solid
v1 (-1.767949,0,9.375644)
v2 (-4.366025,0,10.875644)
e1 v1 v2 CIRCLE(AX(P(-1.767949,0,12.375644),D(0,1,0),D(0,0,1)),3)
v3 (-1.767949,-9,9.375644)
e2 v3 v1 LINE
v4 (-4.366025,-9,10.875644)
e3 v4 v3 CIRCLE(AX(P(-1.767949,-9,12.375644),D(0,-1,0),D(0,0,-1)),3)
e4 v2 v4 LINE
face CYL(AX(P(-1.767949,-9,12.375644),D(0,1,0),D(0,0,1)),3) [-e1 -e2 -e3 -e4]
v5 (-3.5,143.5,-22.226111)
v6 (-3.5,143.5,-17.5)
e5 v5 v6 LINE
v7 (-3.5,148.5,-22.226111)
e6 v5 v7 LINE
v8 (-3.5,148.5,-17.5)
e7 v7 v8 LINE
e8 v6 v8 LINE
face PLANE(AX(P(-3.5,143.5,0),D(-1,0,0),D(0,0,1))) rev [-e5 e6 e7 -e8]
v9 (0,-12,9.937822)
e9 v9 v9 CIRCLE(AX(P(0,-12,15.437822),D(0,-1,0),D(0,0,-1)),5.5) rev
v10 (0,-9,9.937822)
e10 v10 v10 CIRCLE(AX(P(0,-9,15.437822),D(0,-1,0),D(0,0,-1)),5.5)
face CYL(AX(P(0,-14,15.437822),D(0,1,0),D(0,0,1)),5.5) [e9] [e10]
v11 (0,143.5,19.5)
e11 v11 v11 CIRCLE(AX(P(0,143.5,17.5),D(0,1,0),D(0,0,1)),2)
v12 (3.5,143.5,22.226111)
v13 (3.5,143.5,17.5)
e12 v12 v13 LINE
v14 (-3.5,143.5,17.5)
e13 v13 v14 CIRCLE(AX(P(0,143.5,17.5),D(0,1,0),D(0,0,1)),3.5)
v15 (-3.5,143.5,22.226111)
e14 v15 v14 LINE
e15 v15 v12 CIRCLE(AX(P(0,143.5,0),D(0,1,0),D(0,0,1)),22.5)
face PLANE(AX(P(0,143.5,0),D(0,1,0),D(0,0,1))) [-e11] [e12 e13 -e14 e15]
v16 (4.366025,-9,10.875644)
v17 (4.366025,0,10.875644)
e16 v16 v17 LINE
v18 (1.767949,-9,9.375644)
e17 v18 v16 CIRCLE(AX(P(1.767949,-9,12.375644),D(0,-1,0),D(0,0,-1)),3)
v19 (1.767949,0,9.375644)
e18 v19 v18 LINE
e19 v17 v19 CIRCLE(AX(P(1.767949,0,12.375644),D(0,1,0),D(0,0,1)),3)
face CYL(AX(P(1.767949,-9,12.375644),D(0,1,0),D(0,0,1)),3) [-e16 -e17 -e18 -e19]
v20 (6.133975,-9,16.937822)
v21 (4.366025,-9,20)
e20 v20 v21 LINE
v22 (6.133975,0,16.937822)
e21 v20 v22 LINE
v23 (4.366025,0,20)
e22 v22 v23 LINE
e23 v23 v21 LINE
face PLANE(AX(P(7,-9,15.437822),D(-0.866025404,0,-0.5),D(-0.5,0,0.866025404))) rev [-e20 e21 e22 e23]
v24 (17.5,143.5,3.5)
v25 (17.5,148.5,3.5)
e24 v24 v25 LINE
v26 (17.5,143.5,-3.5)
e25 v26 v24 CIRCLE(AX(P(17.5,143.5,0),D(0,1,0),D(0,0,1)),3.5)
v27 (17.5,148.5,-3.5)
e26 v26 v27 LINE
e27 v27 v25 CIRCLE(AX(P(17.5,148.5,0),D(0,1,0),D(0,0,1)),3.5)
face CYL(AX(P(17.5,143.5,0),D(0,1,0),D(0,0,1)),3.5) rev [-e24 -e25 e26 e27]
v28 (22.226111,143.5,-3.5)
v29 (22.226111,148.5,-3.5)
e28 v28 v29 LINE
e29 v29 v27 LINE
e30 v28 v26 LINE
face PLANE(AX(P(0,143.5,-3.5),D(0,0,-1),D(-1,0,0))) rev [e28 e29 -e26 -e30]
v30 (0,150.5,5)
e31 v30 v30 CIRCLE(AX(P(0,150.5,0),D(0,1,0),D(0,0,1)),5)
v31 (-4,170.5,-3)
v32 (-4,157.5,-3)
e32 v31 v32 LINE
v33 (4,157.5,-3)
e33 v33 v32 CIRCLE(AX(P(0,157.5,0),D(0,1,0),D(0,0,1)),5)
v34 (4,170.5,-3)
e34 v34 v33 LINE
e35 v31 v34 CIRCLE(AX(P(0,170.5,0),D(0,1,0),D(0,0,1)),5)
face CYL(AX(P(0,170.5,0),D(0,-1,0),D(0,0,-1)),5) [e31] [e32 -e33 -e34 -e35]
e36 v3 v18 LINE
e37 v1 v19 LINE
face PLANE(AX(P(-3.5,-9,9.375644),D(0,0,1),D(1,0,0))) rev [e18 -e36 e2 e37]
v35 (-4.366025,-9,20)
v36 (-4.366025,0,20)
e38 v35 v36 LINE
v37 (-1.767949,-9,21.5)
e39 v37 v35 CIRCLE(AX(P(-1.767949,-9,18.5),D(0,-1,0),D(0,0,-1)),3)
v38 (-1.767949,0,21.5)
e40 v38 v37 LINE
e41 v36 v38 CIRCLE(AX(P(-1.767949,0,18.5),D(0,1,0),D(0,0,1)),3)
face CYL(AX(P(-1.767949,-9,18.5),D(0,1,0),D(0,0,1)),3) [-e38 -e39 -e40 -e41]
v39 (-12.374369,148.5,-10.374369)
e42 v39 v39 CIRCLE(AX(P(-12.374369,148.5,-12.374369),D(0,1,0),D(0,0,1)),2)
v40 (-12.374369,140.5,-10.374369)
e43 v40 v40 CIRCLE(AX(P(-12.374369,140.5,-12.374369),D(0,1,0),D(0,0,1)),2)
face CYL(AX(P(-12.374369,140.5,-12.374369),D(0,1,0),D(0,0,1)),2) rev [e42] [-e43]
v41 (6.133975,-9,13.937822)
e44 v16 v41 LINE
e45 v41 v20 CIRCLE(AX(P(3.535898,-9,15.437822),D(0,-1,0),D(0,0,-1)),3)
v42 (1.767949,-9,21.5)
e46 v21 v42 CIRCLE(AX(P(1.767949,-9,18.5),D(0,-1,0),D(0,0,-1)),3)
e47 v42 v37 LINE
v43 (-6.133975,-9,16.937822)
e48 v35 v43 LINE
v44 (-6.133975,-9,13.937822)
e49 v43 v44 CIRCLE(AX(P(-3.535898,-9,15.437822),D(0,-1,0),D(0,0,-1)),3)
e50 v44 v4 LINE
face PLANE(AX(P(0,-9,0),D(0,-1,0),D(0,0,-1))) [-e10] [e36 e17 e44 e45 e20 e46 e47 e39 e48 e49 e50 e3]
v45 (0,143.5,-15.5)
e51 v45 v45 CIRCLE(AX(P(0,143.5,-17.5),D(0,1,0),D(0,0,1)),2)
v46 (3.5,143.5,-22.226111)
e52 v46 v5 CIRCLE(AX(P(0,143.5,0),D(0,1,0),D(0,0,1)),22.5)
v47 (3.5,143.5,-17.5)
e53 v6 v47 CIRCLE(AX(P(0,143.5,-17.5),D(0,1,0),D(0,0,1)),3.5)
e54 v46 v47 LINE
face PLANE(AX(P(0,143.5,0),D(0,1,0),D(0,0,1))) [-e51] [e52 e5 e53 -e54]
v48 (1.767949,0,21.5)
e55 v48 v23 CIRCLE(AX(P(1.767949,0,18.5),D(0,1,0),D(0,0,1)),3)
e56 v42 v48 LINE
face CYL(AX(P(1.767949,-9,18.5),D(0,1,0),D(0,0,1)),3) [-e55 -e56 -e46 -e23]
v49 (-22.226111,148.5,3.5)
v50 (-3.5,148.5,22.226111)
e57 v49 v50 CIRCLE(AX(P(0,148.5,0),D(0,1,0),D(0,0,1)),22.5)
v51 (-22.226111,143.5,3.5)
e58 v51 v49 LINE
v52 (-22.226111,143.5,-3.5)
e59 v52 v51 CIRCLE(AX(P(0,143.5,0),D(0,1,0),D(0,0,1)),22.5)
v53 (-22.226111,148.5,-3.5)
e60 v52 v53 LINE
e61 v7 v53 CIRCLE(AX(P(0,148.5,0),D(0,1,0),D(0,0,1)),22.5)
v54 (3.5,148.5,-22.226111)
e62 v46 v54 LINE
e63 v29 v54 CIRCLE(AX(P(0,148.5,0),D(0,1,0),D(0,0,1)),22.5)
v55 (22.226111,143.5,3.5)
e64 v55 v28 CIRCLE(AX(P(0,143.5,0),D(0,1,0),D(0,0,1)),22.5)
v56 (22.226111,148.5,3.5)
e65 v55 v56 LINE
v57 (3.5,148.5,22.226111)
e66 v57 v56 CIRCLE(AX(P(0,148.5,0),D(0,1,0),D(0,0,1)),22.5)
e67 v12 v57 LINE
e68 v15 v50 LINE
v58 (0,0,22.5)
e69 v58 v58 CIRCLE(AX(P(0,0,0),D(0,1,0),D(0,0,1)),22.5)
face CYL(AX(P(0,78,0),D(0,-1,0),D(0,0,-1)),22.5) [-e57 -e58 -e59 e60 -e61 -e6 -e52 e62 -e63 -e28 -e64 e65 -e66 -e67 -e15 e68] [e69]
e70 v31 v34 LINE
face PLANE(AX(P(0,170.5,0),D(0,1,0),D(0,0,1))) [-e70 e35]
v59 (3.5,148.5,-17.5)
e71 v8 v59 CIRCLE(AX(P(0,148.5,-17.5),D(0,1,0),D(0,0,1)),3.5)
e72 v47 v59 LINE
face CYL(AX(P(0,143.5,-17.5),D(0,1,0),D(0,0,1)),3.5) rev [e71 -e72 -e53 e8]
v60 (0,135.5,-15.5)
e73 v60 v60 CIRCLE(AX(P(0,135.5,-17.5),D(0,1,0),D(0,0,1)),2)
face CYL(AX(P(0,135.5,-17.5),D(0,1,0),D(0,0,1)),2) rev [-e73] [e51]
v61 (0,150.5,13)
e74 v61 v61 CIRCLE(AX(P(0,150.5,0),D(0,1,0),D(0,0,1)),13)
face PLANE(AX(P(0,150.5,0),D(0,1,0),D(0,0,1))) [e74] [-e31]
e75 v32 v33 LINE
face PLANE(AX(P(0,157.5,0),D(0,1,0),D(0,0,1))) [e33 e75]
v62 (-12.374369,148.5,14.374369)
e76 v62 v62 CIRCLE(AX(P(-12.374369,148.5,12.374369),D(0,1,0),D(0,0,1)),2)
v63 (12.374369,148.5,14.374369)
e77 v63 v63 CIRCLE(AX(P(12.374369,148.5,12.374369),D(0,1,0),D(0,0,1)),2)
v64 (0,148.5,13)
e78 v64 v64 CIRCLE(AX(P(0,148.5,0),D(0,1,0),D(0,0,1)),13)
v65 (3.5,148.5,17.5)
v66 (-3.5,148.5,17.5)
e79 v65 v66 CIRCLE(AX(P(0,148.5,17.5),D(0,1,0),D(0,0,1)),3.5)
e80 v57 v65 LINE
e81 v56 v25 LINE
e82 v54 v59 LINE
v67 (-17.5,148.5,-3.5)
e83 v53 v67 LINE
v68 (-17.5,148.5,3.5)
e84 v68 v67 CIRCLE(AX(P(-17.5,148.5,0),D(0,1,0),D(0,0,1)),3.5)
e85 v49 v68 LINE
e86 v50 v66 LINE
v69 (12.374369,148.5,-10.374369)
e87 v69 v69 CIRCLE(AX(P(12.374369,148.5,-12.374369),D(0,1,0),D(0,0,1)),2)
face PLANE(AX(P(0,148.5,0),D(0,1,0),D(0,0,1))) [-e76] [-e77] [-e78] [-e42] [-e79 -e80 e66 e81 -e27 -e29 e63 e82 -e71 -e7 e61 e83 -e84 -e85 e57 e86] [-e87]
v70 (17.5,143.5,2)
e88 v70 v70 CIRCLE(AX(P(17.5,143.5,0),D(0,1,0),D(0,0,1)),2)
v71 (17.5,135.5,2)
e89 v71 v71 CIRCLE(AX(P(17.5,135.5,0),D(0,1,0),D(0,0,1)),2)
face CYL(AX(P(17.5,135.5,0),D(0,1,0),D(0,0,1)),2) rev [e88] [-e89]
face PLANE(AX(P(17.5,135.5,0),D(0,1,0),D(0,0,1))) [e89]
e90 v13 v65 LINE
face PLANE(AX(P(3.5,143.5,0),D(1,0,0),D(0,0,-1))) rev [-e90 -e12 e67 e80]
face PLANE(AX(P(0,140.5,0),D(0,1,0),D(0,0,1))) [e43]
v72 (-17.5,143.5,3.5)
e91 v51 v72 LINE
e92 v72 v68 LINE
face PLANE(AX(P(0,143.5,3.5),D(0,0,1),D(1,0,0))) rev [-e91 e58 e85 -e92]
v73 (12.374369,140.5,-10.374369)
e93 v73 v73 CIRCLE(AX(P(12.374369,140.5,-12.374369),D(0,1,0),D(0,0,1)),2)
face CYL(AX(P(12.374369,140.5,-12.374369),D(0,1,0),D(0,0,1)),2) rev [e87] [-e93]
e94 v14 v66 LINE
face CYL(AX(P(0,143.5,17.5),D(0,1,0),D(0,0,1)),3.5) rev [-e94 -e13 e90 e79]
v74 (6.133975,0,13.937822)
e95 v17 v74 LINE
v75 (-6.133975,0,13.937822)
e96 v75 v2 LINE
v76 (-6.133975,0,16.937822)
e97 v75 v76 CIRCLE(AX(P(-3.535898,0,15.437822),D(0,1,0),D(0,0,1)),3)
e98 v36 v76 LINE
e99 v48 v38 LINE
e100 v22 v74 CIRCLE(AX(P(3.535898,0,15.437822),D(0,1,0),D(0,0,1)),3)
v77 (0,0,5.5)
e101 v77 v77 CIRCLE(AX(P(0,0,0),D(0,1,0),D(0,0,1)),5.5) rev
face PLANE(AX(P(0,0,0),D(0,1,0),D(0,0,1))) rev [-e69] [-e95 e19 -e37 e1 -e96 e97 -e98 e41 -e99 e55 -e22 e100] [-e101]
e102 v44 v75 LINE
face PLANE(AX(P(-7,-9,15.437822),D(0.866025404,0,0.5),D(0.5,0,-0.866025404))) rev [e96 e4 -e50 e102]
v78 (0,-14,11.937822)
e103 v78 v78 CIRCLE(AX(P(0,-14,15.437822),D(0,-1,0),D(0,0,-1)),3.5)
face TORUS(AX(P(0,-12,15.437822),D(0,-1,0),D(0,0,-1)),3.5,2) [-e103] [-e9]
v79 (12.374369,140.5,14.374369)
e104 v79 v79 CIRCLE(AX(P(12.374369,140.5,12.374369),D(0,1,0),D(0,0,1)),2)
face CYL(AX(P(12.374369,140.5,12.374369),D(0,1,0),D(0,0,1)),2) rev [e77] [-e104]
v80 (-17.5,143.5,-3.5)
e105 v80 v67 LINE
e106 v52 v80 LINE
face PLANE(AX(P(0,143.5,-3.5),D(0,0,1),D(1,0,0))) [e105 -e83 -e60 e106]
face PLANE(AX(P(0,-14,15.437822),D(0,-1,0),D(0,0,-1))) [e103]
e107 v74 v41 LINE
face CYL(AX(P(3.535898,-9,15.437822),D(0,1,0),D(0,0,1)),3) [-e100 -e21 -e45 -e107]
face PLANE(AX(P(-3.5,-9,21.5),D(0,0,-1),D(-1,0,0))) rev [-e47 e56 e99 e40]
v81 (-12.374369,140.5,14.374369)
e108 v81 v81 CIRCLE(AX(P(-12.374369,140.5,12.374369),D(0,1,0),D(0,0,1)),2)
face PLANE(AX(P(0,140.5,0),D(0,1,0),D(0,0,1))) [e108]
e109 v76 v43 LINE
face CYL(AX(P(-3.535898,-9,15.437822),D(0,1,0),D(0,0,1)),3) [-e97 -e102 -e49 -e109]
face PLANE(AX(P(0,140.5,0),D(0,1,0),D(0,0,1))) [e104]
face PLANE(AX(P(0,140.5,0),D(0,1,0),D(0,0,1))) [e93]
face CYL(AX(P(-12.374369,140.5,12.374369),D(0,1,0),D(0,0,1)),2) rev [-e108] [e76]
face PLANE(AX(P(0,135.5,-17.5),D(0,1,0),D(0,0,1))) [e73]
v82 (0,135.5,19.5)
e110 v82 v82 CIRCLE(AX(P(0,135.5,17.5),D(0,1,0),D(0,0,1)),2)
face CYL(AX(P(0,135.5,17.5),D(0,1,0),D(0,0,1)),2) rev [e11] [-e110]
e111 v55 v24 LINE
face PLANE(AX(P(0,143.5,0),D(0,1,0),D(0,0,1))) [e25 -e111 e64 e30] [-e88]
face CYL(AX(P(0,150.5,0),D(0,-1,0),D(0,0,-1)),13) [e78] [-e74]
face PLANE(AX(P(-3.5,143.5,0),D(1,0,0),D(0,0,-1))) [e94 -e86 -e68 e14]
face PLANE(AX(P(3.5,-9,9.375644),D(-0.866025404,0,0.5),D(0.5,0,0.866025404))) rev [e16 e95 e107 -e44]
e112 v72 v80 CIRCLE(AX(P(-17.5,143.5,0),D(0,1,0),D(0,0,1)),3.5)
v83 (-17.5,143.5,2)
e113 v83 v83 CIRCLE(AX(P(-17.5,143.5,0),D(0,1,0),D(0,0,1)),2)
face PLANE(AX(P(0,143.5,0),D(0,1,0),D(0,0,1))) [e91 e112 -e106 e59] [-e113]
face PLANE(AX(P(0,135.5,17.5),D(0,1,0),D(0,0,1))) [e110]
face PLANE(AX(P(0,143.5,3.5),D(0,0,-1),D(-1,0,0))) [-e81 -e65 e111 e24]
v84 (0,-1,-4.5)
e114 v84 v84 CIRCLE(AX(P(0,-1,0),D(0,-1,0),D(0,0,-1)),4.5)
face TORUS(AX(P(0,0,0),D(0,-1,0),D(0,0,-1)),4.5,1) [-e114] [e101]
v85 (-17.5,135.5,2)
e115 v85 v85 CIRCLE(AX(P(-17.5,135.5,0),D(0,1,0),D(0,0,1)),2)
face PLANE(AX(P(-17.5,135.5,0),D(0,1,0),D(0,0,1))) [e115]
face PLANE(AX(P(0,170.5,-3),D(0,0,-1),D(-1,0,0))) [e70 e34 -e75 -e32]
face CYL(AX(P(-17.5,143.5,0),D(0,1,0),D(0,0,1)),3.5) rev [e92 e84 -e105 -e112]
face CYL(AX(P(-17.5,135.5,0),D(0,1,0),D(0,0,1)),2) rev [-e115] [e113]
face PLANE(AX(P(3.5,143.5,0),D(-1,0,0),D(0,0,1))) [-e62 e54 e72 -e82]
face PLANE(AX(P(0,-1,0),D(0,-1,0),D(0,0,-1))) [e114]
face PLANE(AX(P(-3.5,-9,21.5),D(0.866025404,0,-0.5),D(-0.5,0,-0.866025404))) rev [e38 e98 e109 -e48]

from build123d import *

# Parameters (mm, degrees)
SKETCH1_R           = 22.5
BOSS_EXTRUDE1_DEPTH = 78
SKETCH2_R           = 22.5
BOSS_EXTRUDE2_DEPTH = 70.5
SKETCH3_R           = 13
BOSS_EXTRUDE3_DEPTH = 2
BOSS_EXTRUDE4_DEPTH = 20
SKETCH5_R           = 5
BOSS_EXTRUDE5_DEPTH = 7
SKETCH6_R           = 2
CUT_EXTRUDE1_DEPTH  = 8
CUT_EXTRUDE2_START  = -5
CUT_EXTRUDE2_DEPTH  = 5
SKETCH8_R           = 2
CUT_EXTRUDE3_DEPTH  = 8
BOSS_EXTRUDE6_DEPTH = 9
SKETCH10_R          = 5.5
BOSS_EXTRUDE7_DEPTH = 5
FILLET1_R           = 3
FILLET2_R           = 2
SKETCH11_R          = 5.5
BOSS_EXTRUDE8_DEPTH = 1
FILLET3_R           = 1


with BuildPart() as part:
    # Sketch1 → Boss-Extrude1 (new body)
    with BuildSketch(Plane(origin=(0, 0, 0), x_dir=(1, 0, 0), z_dir=(0, 1, 0))):
        with Locations(Location((0, 0, 0), (0, 0, 270))):
            Circle(SKETCH1_R)
    extrude(amount=BOSS_EXTRUDE1_DEPTH)

    # Sketch2 → Boss-Extrude2 (add)
    with BuildSketch(Plane(origin=(0, 78, 0), x_dir=(1, 0, 0), z_dir=(0, 1, 0))):
        with Locations(Location((0, 0, 0), (0, 0, 270))):
            Circle(SKETCH2_R)
    extrude(amount=BOSS_EXTRUDE2_DEPTH)

    # Sketch3 → Boss-Extrude3 (add)
    with BuildSketch(Plane(origin=(0, 148.5, 0), x_dir=(1, 0, 0), z_dir=(0, 1, 0))):
        with Locations(Location((0, 0, 0), (0, 0, 270))):
            Circle(SKETCH3_R)
    extrude(amount=BOSS_EXTRUDE3_DEPTH)

    # Sketch4 → Boss-Extrude4 (add)
    with BuildSketch(Plane(origin=(0, 150.5, 0), x_dir=(1, 0, 0), z_dir=(0, 1, 0))):
        with BuildLine():
            ThreePointArc((-4, 3), (-4.472135955, -2.236067977), (0, -5))
            Line((0, -5), (0, 3))
            Line((0, 3), (-4, 3))
        make_face()
        with BuildLine():
            Line((0, 3), (0, -5))
            ThreePointArc((0, -5), (3.535533906, -3.535533906), (5, 0))
            ThreePointArc((5, 0), (4.74341649, 1.58113883), (4, 3))
            Line((4, 3), (0, 3))
        make_face()
    extrude(amount=BOSS_EXTRUDE4_DEPTH)

    # Sketch5 → Boss-Extrude5 (add)
    with BuildSketch(Plane(origin=(0, 150.5, 0), x_dir=(1, 0, 0), z_dir=(0, 1, 0))):
        with Locations(Location((0, 0, 0), (0, 0, 143.130102354))):
            Circle(SKETCH5_R)
    extrude(amount=BOSS_EXTRUDE5_DEPTH)

    # Sketch6 → Cut-Extrude1 (cut)
    with BuildSketch(Plane(origin=(0, 148.5, 0), x_dir=(1, 0, 0), z_dir=(0, 1, 0))):
        with Locations(Location((-12.374368671, 12.374368671, 0), (0, 0, 270))):
            Circle(SKETCH6_R)
        with Locations(Location((12.374368671, 12.374368671, 0), (0, 0, 270))):
            Circle(SKETCH6_R)
        with Locations(Location((12.374368671, -12.374368671, 0), (0, 0, 270))):
            Circle(SKETCH6_R)
        with Locations(Location((-12.374368671, -12.374368671, 0), (0, 0, 270))):
            Circle(SKETCH6_R)
    extrude(amount=-CUT_EXTRUDE1_DEPTH, mode=Mode.SUBTRACT)

    # Sketch7 → Cut-Extrude2 (cut)
    with BuildSketch(Plane(origin=(0, 148.5, 0), x_dir=(1, 0, 0), z_dir=(0, 1, 0)).offset(CUT_EXTRUDE2_START)):
        with BuildLine():
            ThreePointArc((22.5, 0), (22.431423187, 1.755350058), (22.226110771, 3.5))
            Line((22.226110771, 3.5), (17.5, 3.5))
            ThreePointArc((17.5, 3.5), (19.974873734, 2.474873734), (21, 0))
            ThreePointArc((21, 0), (19.974873734, -2.474873734), (17.5, -3.5))
            Line((17.5, -3.5), (22.226110771, -3.5))
            ThreePointArc((22.226110771, -3.5), (22.431423187, -1.755350058), (22.5, 0))
        make_face()
        with BuildLine():
            ThreePointArc((21, 0), (19.974873734, 2.474873734), (17.5, 3.5))
            Line((17.5, 3.5), (17.5, -3.5))
            ThreePointArc((17.5, -3.5), (19.974873734, -2.474873734), (21, 0))
        make_face()
        with BuildLine():
            Line((17.5, -3.5), (17.5, 3.5))
            ThreePointArc((17.5, 3.5), (14, 0), (17.5, -3.5))
        make_face()
        with BuildLine():
            ThreePointArc((3.5, 22.226110771), (1.755350006, 22.431423191), (-1.05e-07, 22.5))
            ThreePointArc((-1.05e-07, 22.5), (-1.755350111, 22.431423182), (-3.5, 22.226110771))
            Line((-3.5, 22.226110771), (-3.5, 17.5))
            ThreePointArc((-3.5, 17.5), (0, 21), (3.5, 17.5))
            Line((3.5, 17.5), (3.5, 22.226110771))
        make_face()
        with BuildLine():
            ThreePointArc((3.5, 17.5), (0, 21), (-3.5, 17.5))
            Line((-3.5, 17.5), (3.5, 17.5))
        make_face()
        with BuildLine():
            Line((3.5, 17.5), (-3.5, 17.5))
            ThreePointArc((-3.5, 17.5), (0, 14), (3.5, 17.5))
        make_face()
        with BuildLine():
            ThreePointArc((-14, 0), (-15.025126266, 2.474873734), (-17.5, 3.5))
            Line((-17.5, 3.5), (-17.5, -3.5))
            ThreePointArc((-17.5, -3.5), (-15.025126266, -2.474873734), (-14, 0))
        make_face()
        with BuildLine():
            Line((-17.5, -3.5), (-17.5, 3.5))
            ThreePointArc((-17.5, 3.5), (-21, 0), (-17.5, -3.5))
        make_face()
        with BuildLine():
            Line((-17.5, 3.5), (-22.226110771, 3.5))
            ThreePointArc((-22.226110771, 3.5), (-22.431423191, 1.755350006), (-22.5, -1.05e-07))
            ThreePointArc((-22.5, -1.05e-07), (-22.431423182, -1.755350111), (-22.226110771, -3.5))
            Line((-22.226110771, -3.5), (-17.5, -3.5))
            ThreePointArc((-17.5, -3.5), (-21, 0), (-17.5, 3.5))
        make_face()
        with BuildLine():
            ThreePointArc((3.5, -17.5), (0, -14), (-3.5, -17.5))
            Line((-3.5, -17.5), (3.5, -17.5))
        make_face()
        with BuildLine():
            Line((3.5, -17.5), (-3.5, -17.5))
            ThreePointArc((-3.5, -17.5), (0, -21), (3.5, -17.5))
        make_face()
        with BuildLine():
            Line((-3.5, -17.5), (-3.5, -22.226110771))
            ThreePointArc((-3.5, -22.226110771), (-1.755350006, -22.431423191), (1.05e-07, -22.5))
            ThreePointArc((1.05e-07, -22.5), (1.755350111, -22.431423182), (3.5, -22.226110771))
            Line((3.5, -22.226110771), (3.5, -17.5))
            ThreePointArc((3.5, -17.5), (0, -21), (-3.5, -17.5))
        make_face()
    extrude(amount=CUT_EXTRUDE2_DEPTH, mode=Mode.SUBTRACT)

    # Sketch8 → Cut-Extrude3 (cut)
    with BuildSketch(Plane(origin=(0, 143.5, 0), x_dir=(1, 0, 0), z_dir=(0, 1, 0))):
        with Locations(Location((0, 17.5, 0), (0, 0, 270))):
            Circle(SKETCH8_R)
        with Locations(Location((17.5, 0, 0), (0, 0, 270))):
            Circle(SKETCH8_R)
        with Locations(Location((0, -17.5, 0), (0, 0, 270))):
            Circle(SKETCH8_R)
        with Locations(Location((-17.5, 0, 0), (0, 0, 270))):
            Circle(SKETCH8_R)
    extrude(amount=-CUT_EXTRUDE3_DEPTH, mode=Mode.SUBTRACT)

    # Sketch9 → Boss-Extrude6 (add)
    with BuildSketch(Plane.XZ):
        Polygon((-3.5, 21.5), (3.5, 21.5), (7, 15.437822174), (3.5, 9.375644347), (-3.5, 9.375644347), (-7, 15.437822174), align=None)
    extrude(amount=BOSS_EXTRUDE6_DEPTH)

    # Sketch10 → Boss-Extrude7 (add)
    with BuildSketch(Plane.XZ.offset(9)):
        with Locations(Location((0, 15.437822174, 0), (0, 0, 270))):
            Circle(SKETCH10_R)
    extrude(amount=BOSS_EXTRUDE7_DEPTH)

    # Fillet1
    fillet1_edges = [part.edges().sort_by_distance(p)[0] for p in [
        (-3.5, -4.5, 21.5),
        (-7, -4.5, 15.437822174),
        (-3.5, -4.5, 9.375644347),
        (3.5, -4.5, 9.375644347),
        (7, -4.5, 15.437822174),
        (3.5, -4.5, 21.5),
    ]]
    fillet(fillet1_edges, radius=FILLET1_R)

    # Fillet2
    fillet2_edges = [part.edges().sort_by_distance(p)[0] for p in [
        (0, -14, 20.937822174),
    ]]
    fillet(fillet2_edges, radius=FILLET2_R)

    # Sketch11 → Boss-Extrude8 (add)
    with BuildSketch(Plane.XZ):
        with Locations(Location((0, 0, 0), (0, 0, 90))):
            Circle(SKETCH11_R)
    extrude(amount=BOSS_EXTRUDE8_DEPTH)

    # Fillet3
    fillet3_edges = [part.edges().sort_by_distance(p)[0] for p in [
        (0, -1, -5.5),
    ]]
    fillet(fillet3_edges, radius=FILLET3_R - 0.0001)  # a hair under: the kernel refuses the full size


solid = part.part
